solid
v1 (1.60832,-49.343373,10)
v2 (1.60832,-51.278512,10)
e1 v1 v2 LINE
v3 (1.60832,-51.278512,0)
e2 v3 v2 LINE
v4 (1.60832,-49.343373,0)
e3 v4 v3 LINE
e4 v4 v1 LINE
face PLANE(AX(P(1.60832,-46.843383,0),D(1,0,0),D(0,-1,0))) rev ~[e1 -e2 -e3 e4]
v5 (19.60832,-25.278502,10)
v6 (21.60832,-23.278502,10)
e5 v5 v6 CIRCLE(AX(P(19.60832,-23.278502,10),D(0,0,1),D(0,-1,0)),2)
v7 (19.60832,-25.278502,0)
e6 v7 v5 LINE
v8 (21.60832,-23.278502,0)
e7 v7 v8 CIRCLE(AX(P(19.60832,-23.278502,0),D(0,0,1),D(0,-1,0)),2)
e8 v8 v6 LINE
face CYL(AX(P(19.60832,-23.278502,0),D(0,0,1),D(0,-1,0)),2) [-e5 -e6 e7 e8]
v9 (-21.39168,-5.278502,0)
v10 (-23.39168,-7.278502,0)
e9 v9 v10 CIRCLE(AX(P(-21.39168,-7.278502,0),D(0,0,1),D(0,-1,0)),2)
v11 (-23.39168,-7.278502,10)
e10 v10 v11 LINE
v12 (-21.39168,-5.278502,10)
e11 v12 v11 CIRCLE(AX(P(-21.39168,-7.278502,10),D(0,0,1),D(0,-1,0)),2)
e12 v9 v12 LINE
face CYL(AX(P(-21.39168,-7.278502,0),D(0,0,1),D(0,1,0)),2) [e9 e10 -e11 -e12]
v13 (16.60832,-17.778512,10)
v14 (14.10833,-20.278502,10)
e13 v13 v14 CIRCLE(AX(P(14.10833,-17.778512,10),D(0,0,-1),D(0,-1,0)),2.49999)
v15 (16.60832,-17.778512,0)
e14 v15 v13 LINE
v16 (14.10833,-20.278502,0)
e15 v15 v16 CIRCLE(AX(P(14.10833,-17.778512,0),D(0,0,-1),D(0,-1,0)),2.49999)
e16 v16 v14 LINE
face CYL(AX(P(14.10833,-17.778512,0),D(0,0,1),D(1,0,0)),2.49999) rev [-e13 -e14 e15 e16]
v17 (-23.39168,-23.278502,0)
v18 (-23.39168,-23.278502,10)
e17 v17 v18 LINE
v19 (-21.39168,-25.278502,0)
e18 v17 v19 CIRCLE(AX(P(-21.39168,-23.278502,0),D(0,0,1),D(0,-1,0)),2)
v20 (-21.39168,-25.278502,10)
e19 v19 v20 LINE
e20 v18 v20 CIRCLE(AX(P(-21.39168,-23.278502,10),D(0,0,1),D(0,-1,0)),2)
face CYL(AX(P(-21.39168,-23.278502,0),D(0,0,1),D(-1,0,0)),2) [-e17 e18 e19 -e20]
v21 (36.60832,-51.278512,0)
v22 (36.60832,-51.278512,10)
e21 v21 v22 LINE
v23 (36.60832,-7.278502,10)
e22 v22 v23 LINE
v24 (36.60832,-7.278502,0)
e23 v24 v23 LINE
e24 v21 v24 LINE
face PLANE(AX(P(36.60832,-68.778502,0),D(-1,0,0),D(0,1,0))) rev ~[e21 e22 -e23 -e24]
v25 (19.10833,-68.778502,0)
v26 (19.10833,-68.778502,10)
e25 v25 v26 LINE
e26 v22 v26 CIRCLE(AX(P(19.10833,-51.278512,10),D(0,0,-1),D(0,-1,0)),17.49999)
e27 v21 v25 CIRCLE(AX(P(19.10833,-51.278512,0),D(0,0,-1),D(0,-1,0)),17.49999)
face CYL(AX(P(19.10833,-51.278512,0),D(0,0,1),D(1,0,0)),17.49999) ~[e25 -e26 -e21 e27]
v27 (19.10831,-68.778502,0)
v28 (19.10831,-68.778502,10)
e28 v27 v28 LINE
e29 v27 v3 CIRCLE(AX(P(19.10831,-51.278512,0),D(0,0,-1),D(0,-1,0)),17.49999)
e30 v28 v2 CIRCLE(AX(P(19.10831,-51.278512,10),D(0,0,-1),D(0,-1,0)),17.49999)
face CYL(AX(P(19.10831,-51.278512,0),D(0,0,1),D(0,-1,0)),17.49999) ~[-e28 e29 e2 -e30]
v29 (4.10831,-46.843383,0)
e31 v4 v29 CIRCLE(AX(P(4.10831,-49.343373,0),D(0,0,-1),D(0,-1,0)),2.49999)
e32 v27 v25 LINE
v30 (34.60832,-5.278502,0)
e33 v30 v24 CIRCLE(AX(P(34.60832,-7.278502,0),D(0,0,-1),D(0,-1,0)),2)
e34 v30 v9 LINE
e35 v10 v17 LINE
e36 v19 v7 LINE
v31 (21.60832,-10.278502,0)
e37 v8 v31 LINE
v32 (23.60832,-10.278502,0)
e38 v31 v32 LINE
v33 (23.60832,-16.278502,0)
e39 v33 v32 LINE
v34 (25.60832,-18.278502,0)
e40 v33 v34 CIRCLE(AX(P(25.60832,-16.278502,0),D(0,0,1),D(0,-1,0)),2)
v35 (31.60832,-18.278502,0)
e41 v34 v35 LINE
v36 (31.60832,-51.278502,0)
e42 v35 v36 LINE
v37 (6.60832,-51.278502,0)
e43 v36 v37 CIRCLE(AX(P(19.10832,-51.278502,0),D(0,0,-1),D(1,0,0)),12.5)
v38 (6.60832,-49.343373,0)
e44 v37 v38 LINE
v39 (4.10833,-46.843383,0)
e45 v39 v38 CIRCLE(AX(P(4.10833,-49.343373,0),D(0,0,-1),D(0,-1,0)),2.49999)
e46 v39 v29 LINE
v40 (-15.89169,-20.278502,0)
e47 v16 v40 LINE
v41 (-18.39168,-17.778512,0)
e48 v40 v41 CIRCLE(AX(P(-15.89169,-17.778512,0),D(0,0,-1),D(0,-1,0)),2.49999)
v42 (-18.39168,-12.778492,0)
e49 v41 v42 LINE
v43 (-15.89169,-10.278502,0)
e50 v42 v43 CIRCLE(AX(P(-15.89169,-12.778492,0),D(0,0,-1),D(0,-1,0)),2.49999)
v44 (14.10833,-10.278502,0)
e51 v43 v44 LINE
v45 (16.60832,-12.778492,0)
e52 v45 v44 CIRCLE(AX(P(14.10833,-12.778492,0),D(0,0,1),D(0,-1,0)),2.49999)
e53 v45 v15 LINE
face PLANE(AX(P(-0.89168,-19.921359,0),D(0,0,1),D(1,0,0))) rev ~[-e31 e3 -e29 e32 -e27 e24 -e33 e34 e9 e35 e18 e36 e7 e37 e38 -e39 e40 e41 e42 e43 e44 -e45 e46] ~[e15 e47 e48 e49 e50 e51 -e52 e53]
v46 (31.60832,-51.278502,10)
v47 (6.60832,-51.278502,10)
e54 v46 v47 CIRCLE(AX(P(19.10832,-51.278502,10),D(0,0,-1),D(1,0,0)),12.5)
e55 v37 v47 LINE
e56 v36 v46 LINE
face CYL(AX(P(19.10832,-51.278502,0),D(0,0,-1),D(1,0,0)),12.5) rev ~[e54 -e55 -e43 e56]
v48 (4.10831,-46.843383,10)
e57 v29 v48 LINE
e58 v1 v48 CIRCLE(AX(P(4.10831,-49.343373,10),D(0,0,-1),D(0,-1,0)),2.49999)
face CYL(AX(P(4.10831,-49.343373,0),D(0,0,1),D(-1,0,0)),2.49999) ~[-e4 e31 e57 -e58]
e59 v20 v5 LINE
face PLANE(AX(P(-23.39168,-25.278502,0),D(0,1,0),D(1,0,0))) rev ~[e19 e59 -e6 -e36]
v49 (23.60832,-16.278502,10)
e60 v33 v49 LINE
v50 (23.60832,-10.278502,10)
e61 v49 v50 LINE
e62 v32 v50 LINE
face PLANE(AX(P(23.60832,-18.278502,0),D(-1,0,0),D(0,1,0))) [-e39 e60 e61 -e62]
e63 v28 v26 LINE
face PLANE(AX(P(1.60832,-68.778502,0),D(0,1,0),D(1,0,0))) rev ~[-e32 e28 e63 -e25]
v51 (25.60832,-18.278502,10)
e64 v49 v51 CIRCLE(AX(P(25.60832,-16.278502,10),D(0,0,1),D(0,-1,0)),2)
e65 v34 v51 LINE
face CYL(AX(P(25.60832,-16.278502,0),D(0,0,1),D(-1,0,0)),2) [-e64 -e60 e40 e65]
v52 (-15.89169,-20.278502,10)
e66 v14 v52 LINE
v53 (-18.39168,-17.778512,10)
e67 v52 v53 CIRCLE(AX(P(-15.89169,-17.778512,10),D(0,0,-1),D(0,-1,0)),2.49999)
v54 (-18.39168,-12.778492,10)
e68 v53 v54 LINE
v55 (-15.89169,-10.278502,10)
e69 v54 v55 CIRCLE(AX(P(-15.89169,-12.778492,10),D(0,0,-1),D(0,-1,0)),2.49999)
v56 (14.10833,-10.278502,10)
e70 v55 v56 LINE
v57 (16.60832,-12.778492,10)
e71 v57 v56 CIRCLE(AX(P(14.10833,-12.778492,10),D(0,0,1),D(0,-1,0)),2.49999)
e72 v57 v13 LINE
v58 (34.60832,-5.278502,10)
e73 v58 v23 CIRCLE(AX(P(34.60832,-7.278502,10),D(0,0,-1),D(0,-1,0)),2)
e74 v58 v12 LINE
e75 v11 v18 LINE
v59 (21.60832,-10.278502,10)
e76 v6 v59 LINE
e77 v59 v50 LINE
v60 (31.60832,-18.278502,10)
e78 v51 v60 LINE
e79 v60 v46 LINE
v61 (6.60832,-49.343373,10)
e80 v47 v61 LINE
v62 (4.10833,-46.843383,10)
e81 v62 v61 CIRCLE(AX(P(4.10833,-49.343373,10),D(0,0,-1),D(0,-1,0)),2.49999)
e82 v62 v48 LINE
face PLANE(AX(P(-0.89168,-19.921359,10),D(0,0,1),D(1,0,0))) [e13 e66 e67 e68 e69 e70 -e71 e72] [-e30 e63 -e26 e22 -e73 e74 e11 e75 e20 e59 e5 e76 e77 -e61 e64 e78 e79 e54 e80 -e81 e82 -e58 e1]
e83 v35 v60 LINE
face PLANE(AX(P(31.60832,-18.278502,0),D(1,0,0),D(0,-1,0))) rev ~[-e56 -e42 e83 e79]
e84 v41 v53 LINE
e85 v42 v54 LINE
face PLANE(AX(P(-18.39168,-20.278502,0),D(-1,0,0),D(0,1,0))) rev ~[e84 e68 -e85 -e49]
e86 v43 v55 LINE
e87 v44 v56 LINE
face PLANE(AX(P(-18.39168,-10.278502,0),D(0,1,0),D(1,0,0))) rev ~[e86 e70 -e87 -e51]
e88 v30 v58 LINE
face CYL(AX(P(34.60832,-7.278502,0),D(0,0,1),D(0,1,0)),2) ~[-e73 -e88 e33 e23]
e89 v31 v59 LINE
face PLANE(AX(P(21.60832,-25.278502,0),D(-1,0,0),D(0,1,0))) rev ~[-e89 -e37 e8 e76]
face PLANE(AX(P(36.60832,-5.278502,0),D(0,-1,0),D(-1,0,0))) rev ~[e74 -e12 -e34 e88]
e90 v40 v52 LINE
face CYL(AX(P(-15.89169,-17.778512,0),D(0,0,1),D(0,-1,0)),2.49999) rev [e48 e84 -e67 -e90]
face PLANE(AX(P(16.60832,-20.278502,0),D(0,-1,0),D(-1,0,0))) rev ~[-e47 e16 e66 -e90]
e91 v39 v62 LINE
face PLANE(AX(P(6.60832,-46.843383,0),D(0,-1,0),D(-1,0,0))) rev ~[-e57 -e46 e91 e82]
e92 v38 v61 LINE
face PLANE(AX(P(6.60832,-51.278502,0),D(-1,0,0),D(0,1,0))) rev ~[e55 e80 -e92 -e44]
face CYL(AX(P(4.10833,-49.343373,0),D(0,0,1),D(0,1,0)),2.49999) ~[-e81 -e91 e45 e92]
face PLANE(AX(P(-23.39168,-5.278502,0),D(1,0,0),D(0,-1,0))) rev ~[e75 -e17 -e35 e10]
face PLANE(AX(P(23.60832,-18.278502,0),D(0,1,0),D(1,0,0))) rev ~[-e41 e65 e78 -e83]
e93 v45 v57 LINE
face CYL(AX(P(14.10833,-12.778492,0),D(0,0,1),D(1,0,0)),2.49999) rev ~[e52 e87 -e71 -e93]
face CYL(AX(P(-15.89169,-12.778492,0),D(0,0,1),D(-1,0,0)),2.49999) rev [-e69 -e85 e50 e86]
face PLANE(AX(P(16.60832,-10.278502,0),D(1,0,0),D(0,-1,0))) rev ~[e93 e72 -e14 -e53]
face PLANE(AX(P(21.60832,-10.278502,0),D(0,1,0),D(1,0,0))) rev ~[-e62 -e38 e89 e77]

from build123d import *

# Parameters (mm, degrees)
F0_W     = 8
F0_H     = 8
F1_DEPTH = 10
F2_R     = 2
F3_R     = 17.49999
F4_R     = 2.49999


# Not quite as in the source:
# - a fillet or chamfer is up to 0.001 mm smaller than in the source, because OpenCascade refuses the exact size
# - a feature names something its author has since deleted; it is built from what else it names


with BuildPart() as f1:
    # F0 (on Top) → F1 (new body)
    with BuildSketch(Plane.XY):
        Polygon((-18.3916796818, -10.2785023413), (-23.3916796818, -10.2785023413), (-23.3916796818, -25.2785023413), (21.6083203182, -25.2785023413), (21.6083203182, -18.2785023413), (21.6083203182, -10.2785023413), (16.6083203182, -10.2785023413), (16.6083203182, -20.2785023413), (-18.3916796818, -20.2785023413), align=None)
        Polygon((-23.3916796818, -5.2785023413), (-23.3916796818, -10.2785023413), (-18.3916796818, -10.2785023413), (16.6083203182, -10.2785023413), (21.6083203182, -10.2785023413), (23.6083203182, -10.2785023413), (31.6083203182, -10.2785023413), (36.6083203182, -10.2785023413), (36.6083203182, -5.2785023413), align=None)
        with Locations((27.6083203182, -14.2785023413)):
            Rectangle(F0_W, F0_H)
        Polygon((36.6083203182, -36.2785023413), (36.6083203182, -10.2785023413), (31.6083203182, -10.2785023413), (31.6083203182, -18.2785023413), (31.6083203182, -36.2785023413), align=None)
        with BuildLine():
            Line((36.6083203182, -68.7785023413), (36.6083203182, -36.2785023413))
            Line((36.6083203182, -36.2785023413), (31.6083203182, -36.2785023413))
            Line((31.6083203182, -36.2785023413), (31.6083203182, -46.8433834612))
            Line((31.6083203182, -46.8433834612), (31.6083203182, -51.2785023413))
            ThreePointArc((31.6083203182, -51.2785023413), (19.1083203182, -63.7785023413), (6.6083203182, -51.2785023413))
            Line((6.6083203182, -51.2785023413), (6.6083203182, -46.8433834612))
            Line((6.6083203182, -46.8433834612), (1.6083203182, -46.8433834612))
            Line((1.6083203182, -46.8433834612), (1.6083203182, -68.7785023413))
            Line((1.6083203182, -68.7785023413), (36.6083203182, -68.7785023413))
        make_face()
    extrude(amount=F1_DEPTH)

    # F2
    f2_edges = [f1.edges().sort_by_distance(p)[0] for p in [
        (-23.39168, -25.278502, 5),
        (21.60832, -25.278502, 5),
        (23.60832, -18.278502, 5),
        (36.60832, -5.278502, 5),
        (-23.39168, -5.278502, 5),
    ]]
    fillet(f2_edges, radius=F2_R)

    # F3 (radius 17.5 in the source; OpenCascade refuses exactly that, so slightly less here)
    f3_edges = [f1.edges().sort_by_distance(p)[0] for p in [
        (1.60832, -68.778502, 5),
        (36.60832, -68.778502, 5),
    ]]
    fillet(f3_edges, radius=F3_R)

    # F4 (radius 2.5 in the source; OpenCascade refuses exactly that, so slightly less here)
    f4_edges = [f1.edges().sort_by_distance(p)[0] for p in [
        (1.60832, -46.843383, 5),
        (6.60832, -46.843383, 5),
        (-18.39168, -20.278502, 5),
        (-18.39168, -10.278502, 5),
        (16.60832, -10.278502, 5),
        (16.60832, -20.278502, 5),
    ]]
    fillet(f4_edges, radius=F4_R)


solid = f1.part
